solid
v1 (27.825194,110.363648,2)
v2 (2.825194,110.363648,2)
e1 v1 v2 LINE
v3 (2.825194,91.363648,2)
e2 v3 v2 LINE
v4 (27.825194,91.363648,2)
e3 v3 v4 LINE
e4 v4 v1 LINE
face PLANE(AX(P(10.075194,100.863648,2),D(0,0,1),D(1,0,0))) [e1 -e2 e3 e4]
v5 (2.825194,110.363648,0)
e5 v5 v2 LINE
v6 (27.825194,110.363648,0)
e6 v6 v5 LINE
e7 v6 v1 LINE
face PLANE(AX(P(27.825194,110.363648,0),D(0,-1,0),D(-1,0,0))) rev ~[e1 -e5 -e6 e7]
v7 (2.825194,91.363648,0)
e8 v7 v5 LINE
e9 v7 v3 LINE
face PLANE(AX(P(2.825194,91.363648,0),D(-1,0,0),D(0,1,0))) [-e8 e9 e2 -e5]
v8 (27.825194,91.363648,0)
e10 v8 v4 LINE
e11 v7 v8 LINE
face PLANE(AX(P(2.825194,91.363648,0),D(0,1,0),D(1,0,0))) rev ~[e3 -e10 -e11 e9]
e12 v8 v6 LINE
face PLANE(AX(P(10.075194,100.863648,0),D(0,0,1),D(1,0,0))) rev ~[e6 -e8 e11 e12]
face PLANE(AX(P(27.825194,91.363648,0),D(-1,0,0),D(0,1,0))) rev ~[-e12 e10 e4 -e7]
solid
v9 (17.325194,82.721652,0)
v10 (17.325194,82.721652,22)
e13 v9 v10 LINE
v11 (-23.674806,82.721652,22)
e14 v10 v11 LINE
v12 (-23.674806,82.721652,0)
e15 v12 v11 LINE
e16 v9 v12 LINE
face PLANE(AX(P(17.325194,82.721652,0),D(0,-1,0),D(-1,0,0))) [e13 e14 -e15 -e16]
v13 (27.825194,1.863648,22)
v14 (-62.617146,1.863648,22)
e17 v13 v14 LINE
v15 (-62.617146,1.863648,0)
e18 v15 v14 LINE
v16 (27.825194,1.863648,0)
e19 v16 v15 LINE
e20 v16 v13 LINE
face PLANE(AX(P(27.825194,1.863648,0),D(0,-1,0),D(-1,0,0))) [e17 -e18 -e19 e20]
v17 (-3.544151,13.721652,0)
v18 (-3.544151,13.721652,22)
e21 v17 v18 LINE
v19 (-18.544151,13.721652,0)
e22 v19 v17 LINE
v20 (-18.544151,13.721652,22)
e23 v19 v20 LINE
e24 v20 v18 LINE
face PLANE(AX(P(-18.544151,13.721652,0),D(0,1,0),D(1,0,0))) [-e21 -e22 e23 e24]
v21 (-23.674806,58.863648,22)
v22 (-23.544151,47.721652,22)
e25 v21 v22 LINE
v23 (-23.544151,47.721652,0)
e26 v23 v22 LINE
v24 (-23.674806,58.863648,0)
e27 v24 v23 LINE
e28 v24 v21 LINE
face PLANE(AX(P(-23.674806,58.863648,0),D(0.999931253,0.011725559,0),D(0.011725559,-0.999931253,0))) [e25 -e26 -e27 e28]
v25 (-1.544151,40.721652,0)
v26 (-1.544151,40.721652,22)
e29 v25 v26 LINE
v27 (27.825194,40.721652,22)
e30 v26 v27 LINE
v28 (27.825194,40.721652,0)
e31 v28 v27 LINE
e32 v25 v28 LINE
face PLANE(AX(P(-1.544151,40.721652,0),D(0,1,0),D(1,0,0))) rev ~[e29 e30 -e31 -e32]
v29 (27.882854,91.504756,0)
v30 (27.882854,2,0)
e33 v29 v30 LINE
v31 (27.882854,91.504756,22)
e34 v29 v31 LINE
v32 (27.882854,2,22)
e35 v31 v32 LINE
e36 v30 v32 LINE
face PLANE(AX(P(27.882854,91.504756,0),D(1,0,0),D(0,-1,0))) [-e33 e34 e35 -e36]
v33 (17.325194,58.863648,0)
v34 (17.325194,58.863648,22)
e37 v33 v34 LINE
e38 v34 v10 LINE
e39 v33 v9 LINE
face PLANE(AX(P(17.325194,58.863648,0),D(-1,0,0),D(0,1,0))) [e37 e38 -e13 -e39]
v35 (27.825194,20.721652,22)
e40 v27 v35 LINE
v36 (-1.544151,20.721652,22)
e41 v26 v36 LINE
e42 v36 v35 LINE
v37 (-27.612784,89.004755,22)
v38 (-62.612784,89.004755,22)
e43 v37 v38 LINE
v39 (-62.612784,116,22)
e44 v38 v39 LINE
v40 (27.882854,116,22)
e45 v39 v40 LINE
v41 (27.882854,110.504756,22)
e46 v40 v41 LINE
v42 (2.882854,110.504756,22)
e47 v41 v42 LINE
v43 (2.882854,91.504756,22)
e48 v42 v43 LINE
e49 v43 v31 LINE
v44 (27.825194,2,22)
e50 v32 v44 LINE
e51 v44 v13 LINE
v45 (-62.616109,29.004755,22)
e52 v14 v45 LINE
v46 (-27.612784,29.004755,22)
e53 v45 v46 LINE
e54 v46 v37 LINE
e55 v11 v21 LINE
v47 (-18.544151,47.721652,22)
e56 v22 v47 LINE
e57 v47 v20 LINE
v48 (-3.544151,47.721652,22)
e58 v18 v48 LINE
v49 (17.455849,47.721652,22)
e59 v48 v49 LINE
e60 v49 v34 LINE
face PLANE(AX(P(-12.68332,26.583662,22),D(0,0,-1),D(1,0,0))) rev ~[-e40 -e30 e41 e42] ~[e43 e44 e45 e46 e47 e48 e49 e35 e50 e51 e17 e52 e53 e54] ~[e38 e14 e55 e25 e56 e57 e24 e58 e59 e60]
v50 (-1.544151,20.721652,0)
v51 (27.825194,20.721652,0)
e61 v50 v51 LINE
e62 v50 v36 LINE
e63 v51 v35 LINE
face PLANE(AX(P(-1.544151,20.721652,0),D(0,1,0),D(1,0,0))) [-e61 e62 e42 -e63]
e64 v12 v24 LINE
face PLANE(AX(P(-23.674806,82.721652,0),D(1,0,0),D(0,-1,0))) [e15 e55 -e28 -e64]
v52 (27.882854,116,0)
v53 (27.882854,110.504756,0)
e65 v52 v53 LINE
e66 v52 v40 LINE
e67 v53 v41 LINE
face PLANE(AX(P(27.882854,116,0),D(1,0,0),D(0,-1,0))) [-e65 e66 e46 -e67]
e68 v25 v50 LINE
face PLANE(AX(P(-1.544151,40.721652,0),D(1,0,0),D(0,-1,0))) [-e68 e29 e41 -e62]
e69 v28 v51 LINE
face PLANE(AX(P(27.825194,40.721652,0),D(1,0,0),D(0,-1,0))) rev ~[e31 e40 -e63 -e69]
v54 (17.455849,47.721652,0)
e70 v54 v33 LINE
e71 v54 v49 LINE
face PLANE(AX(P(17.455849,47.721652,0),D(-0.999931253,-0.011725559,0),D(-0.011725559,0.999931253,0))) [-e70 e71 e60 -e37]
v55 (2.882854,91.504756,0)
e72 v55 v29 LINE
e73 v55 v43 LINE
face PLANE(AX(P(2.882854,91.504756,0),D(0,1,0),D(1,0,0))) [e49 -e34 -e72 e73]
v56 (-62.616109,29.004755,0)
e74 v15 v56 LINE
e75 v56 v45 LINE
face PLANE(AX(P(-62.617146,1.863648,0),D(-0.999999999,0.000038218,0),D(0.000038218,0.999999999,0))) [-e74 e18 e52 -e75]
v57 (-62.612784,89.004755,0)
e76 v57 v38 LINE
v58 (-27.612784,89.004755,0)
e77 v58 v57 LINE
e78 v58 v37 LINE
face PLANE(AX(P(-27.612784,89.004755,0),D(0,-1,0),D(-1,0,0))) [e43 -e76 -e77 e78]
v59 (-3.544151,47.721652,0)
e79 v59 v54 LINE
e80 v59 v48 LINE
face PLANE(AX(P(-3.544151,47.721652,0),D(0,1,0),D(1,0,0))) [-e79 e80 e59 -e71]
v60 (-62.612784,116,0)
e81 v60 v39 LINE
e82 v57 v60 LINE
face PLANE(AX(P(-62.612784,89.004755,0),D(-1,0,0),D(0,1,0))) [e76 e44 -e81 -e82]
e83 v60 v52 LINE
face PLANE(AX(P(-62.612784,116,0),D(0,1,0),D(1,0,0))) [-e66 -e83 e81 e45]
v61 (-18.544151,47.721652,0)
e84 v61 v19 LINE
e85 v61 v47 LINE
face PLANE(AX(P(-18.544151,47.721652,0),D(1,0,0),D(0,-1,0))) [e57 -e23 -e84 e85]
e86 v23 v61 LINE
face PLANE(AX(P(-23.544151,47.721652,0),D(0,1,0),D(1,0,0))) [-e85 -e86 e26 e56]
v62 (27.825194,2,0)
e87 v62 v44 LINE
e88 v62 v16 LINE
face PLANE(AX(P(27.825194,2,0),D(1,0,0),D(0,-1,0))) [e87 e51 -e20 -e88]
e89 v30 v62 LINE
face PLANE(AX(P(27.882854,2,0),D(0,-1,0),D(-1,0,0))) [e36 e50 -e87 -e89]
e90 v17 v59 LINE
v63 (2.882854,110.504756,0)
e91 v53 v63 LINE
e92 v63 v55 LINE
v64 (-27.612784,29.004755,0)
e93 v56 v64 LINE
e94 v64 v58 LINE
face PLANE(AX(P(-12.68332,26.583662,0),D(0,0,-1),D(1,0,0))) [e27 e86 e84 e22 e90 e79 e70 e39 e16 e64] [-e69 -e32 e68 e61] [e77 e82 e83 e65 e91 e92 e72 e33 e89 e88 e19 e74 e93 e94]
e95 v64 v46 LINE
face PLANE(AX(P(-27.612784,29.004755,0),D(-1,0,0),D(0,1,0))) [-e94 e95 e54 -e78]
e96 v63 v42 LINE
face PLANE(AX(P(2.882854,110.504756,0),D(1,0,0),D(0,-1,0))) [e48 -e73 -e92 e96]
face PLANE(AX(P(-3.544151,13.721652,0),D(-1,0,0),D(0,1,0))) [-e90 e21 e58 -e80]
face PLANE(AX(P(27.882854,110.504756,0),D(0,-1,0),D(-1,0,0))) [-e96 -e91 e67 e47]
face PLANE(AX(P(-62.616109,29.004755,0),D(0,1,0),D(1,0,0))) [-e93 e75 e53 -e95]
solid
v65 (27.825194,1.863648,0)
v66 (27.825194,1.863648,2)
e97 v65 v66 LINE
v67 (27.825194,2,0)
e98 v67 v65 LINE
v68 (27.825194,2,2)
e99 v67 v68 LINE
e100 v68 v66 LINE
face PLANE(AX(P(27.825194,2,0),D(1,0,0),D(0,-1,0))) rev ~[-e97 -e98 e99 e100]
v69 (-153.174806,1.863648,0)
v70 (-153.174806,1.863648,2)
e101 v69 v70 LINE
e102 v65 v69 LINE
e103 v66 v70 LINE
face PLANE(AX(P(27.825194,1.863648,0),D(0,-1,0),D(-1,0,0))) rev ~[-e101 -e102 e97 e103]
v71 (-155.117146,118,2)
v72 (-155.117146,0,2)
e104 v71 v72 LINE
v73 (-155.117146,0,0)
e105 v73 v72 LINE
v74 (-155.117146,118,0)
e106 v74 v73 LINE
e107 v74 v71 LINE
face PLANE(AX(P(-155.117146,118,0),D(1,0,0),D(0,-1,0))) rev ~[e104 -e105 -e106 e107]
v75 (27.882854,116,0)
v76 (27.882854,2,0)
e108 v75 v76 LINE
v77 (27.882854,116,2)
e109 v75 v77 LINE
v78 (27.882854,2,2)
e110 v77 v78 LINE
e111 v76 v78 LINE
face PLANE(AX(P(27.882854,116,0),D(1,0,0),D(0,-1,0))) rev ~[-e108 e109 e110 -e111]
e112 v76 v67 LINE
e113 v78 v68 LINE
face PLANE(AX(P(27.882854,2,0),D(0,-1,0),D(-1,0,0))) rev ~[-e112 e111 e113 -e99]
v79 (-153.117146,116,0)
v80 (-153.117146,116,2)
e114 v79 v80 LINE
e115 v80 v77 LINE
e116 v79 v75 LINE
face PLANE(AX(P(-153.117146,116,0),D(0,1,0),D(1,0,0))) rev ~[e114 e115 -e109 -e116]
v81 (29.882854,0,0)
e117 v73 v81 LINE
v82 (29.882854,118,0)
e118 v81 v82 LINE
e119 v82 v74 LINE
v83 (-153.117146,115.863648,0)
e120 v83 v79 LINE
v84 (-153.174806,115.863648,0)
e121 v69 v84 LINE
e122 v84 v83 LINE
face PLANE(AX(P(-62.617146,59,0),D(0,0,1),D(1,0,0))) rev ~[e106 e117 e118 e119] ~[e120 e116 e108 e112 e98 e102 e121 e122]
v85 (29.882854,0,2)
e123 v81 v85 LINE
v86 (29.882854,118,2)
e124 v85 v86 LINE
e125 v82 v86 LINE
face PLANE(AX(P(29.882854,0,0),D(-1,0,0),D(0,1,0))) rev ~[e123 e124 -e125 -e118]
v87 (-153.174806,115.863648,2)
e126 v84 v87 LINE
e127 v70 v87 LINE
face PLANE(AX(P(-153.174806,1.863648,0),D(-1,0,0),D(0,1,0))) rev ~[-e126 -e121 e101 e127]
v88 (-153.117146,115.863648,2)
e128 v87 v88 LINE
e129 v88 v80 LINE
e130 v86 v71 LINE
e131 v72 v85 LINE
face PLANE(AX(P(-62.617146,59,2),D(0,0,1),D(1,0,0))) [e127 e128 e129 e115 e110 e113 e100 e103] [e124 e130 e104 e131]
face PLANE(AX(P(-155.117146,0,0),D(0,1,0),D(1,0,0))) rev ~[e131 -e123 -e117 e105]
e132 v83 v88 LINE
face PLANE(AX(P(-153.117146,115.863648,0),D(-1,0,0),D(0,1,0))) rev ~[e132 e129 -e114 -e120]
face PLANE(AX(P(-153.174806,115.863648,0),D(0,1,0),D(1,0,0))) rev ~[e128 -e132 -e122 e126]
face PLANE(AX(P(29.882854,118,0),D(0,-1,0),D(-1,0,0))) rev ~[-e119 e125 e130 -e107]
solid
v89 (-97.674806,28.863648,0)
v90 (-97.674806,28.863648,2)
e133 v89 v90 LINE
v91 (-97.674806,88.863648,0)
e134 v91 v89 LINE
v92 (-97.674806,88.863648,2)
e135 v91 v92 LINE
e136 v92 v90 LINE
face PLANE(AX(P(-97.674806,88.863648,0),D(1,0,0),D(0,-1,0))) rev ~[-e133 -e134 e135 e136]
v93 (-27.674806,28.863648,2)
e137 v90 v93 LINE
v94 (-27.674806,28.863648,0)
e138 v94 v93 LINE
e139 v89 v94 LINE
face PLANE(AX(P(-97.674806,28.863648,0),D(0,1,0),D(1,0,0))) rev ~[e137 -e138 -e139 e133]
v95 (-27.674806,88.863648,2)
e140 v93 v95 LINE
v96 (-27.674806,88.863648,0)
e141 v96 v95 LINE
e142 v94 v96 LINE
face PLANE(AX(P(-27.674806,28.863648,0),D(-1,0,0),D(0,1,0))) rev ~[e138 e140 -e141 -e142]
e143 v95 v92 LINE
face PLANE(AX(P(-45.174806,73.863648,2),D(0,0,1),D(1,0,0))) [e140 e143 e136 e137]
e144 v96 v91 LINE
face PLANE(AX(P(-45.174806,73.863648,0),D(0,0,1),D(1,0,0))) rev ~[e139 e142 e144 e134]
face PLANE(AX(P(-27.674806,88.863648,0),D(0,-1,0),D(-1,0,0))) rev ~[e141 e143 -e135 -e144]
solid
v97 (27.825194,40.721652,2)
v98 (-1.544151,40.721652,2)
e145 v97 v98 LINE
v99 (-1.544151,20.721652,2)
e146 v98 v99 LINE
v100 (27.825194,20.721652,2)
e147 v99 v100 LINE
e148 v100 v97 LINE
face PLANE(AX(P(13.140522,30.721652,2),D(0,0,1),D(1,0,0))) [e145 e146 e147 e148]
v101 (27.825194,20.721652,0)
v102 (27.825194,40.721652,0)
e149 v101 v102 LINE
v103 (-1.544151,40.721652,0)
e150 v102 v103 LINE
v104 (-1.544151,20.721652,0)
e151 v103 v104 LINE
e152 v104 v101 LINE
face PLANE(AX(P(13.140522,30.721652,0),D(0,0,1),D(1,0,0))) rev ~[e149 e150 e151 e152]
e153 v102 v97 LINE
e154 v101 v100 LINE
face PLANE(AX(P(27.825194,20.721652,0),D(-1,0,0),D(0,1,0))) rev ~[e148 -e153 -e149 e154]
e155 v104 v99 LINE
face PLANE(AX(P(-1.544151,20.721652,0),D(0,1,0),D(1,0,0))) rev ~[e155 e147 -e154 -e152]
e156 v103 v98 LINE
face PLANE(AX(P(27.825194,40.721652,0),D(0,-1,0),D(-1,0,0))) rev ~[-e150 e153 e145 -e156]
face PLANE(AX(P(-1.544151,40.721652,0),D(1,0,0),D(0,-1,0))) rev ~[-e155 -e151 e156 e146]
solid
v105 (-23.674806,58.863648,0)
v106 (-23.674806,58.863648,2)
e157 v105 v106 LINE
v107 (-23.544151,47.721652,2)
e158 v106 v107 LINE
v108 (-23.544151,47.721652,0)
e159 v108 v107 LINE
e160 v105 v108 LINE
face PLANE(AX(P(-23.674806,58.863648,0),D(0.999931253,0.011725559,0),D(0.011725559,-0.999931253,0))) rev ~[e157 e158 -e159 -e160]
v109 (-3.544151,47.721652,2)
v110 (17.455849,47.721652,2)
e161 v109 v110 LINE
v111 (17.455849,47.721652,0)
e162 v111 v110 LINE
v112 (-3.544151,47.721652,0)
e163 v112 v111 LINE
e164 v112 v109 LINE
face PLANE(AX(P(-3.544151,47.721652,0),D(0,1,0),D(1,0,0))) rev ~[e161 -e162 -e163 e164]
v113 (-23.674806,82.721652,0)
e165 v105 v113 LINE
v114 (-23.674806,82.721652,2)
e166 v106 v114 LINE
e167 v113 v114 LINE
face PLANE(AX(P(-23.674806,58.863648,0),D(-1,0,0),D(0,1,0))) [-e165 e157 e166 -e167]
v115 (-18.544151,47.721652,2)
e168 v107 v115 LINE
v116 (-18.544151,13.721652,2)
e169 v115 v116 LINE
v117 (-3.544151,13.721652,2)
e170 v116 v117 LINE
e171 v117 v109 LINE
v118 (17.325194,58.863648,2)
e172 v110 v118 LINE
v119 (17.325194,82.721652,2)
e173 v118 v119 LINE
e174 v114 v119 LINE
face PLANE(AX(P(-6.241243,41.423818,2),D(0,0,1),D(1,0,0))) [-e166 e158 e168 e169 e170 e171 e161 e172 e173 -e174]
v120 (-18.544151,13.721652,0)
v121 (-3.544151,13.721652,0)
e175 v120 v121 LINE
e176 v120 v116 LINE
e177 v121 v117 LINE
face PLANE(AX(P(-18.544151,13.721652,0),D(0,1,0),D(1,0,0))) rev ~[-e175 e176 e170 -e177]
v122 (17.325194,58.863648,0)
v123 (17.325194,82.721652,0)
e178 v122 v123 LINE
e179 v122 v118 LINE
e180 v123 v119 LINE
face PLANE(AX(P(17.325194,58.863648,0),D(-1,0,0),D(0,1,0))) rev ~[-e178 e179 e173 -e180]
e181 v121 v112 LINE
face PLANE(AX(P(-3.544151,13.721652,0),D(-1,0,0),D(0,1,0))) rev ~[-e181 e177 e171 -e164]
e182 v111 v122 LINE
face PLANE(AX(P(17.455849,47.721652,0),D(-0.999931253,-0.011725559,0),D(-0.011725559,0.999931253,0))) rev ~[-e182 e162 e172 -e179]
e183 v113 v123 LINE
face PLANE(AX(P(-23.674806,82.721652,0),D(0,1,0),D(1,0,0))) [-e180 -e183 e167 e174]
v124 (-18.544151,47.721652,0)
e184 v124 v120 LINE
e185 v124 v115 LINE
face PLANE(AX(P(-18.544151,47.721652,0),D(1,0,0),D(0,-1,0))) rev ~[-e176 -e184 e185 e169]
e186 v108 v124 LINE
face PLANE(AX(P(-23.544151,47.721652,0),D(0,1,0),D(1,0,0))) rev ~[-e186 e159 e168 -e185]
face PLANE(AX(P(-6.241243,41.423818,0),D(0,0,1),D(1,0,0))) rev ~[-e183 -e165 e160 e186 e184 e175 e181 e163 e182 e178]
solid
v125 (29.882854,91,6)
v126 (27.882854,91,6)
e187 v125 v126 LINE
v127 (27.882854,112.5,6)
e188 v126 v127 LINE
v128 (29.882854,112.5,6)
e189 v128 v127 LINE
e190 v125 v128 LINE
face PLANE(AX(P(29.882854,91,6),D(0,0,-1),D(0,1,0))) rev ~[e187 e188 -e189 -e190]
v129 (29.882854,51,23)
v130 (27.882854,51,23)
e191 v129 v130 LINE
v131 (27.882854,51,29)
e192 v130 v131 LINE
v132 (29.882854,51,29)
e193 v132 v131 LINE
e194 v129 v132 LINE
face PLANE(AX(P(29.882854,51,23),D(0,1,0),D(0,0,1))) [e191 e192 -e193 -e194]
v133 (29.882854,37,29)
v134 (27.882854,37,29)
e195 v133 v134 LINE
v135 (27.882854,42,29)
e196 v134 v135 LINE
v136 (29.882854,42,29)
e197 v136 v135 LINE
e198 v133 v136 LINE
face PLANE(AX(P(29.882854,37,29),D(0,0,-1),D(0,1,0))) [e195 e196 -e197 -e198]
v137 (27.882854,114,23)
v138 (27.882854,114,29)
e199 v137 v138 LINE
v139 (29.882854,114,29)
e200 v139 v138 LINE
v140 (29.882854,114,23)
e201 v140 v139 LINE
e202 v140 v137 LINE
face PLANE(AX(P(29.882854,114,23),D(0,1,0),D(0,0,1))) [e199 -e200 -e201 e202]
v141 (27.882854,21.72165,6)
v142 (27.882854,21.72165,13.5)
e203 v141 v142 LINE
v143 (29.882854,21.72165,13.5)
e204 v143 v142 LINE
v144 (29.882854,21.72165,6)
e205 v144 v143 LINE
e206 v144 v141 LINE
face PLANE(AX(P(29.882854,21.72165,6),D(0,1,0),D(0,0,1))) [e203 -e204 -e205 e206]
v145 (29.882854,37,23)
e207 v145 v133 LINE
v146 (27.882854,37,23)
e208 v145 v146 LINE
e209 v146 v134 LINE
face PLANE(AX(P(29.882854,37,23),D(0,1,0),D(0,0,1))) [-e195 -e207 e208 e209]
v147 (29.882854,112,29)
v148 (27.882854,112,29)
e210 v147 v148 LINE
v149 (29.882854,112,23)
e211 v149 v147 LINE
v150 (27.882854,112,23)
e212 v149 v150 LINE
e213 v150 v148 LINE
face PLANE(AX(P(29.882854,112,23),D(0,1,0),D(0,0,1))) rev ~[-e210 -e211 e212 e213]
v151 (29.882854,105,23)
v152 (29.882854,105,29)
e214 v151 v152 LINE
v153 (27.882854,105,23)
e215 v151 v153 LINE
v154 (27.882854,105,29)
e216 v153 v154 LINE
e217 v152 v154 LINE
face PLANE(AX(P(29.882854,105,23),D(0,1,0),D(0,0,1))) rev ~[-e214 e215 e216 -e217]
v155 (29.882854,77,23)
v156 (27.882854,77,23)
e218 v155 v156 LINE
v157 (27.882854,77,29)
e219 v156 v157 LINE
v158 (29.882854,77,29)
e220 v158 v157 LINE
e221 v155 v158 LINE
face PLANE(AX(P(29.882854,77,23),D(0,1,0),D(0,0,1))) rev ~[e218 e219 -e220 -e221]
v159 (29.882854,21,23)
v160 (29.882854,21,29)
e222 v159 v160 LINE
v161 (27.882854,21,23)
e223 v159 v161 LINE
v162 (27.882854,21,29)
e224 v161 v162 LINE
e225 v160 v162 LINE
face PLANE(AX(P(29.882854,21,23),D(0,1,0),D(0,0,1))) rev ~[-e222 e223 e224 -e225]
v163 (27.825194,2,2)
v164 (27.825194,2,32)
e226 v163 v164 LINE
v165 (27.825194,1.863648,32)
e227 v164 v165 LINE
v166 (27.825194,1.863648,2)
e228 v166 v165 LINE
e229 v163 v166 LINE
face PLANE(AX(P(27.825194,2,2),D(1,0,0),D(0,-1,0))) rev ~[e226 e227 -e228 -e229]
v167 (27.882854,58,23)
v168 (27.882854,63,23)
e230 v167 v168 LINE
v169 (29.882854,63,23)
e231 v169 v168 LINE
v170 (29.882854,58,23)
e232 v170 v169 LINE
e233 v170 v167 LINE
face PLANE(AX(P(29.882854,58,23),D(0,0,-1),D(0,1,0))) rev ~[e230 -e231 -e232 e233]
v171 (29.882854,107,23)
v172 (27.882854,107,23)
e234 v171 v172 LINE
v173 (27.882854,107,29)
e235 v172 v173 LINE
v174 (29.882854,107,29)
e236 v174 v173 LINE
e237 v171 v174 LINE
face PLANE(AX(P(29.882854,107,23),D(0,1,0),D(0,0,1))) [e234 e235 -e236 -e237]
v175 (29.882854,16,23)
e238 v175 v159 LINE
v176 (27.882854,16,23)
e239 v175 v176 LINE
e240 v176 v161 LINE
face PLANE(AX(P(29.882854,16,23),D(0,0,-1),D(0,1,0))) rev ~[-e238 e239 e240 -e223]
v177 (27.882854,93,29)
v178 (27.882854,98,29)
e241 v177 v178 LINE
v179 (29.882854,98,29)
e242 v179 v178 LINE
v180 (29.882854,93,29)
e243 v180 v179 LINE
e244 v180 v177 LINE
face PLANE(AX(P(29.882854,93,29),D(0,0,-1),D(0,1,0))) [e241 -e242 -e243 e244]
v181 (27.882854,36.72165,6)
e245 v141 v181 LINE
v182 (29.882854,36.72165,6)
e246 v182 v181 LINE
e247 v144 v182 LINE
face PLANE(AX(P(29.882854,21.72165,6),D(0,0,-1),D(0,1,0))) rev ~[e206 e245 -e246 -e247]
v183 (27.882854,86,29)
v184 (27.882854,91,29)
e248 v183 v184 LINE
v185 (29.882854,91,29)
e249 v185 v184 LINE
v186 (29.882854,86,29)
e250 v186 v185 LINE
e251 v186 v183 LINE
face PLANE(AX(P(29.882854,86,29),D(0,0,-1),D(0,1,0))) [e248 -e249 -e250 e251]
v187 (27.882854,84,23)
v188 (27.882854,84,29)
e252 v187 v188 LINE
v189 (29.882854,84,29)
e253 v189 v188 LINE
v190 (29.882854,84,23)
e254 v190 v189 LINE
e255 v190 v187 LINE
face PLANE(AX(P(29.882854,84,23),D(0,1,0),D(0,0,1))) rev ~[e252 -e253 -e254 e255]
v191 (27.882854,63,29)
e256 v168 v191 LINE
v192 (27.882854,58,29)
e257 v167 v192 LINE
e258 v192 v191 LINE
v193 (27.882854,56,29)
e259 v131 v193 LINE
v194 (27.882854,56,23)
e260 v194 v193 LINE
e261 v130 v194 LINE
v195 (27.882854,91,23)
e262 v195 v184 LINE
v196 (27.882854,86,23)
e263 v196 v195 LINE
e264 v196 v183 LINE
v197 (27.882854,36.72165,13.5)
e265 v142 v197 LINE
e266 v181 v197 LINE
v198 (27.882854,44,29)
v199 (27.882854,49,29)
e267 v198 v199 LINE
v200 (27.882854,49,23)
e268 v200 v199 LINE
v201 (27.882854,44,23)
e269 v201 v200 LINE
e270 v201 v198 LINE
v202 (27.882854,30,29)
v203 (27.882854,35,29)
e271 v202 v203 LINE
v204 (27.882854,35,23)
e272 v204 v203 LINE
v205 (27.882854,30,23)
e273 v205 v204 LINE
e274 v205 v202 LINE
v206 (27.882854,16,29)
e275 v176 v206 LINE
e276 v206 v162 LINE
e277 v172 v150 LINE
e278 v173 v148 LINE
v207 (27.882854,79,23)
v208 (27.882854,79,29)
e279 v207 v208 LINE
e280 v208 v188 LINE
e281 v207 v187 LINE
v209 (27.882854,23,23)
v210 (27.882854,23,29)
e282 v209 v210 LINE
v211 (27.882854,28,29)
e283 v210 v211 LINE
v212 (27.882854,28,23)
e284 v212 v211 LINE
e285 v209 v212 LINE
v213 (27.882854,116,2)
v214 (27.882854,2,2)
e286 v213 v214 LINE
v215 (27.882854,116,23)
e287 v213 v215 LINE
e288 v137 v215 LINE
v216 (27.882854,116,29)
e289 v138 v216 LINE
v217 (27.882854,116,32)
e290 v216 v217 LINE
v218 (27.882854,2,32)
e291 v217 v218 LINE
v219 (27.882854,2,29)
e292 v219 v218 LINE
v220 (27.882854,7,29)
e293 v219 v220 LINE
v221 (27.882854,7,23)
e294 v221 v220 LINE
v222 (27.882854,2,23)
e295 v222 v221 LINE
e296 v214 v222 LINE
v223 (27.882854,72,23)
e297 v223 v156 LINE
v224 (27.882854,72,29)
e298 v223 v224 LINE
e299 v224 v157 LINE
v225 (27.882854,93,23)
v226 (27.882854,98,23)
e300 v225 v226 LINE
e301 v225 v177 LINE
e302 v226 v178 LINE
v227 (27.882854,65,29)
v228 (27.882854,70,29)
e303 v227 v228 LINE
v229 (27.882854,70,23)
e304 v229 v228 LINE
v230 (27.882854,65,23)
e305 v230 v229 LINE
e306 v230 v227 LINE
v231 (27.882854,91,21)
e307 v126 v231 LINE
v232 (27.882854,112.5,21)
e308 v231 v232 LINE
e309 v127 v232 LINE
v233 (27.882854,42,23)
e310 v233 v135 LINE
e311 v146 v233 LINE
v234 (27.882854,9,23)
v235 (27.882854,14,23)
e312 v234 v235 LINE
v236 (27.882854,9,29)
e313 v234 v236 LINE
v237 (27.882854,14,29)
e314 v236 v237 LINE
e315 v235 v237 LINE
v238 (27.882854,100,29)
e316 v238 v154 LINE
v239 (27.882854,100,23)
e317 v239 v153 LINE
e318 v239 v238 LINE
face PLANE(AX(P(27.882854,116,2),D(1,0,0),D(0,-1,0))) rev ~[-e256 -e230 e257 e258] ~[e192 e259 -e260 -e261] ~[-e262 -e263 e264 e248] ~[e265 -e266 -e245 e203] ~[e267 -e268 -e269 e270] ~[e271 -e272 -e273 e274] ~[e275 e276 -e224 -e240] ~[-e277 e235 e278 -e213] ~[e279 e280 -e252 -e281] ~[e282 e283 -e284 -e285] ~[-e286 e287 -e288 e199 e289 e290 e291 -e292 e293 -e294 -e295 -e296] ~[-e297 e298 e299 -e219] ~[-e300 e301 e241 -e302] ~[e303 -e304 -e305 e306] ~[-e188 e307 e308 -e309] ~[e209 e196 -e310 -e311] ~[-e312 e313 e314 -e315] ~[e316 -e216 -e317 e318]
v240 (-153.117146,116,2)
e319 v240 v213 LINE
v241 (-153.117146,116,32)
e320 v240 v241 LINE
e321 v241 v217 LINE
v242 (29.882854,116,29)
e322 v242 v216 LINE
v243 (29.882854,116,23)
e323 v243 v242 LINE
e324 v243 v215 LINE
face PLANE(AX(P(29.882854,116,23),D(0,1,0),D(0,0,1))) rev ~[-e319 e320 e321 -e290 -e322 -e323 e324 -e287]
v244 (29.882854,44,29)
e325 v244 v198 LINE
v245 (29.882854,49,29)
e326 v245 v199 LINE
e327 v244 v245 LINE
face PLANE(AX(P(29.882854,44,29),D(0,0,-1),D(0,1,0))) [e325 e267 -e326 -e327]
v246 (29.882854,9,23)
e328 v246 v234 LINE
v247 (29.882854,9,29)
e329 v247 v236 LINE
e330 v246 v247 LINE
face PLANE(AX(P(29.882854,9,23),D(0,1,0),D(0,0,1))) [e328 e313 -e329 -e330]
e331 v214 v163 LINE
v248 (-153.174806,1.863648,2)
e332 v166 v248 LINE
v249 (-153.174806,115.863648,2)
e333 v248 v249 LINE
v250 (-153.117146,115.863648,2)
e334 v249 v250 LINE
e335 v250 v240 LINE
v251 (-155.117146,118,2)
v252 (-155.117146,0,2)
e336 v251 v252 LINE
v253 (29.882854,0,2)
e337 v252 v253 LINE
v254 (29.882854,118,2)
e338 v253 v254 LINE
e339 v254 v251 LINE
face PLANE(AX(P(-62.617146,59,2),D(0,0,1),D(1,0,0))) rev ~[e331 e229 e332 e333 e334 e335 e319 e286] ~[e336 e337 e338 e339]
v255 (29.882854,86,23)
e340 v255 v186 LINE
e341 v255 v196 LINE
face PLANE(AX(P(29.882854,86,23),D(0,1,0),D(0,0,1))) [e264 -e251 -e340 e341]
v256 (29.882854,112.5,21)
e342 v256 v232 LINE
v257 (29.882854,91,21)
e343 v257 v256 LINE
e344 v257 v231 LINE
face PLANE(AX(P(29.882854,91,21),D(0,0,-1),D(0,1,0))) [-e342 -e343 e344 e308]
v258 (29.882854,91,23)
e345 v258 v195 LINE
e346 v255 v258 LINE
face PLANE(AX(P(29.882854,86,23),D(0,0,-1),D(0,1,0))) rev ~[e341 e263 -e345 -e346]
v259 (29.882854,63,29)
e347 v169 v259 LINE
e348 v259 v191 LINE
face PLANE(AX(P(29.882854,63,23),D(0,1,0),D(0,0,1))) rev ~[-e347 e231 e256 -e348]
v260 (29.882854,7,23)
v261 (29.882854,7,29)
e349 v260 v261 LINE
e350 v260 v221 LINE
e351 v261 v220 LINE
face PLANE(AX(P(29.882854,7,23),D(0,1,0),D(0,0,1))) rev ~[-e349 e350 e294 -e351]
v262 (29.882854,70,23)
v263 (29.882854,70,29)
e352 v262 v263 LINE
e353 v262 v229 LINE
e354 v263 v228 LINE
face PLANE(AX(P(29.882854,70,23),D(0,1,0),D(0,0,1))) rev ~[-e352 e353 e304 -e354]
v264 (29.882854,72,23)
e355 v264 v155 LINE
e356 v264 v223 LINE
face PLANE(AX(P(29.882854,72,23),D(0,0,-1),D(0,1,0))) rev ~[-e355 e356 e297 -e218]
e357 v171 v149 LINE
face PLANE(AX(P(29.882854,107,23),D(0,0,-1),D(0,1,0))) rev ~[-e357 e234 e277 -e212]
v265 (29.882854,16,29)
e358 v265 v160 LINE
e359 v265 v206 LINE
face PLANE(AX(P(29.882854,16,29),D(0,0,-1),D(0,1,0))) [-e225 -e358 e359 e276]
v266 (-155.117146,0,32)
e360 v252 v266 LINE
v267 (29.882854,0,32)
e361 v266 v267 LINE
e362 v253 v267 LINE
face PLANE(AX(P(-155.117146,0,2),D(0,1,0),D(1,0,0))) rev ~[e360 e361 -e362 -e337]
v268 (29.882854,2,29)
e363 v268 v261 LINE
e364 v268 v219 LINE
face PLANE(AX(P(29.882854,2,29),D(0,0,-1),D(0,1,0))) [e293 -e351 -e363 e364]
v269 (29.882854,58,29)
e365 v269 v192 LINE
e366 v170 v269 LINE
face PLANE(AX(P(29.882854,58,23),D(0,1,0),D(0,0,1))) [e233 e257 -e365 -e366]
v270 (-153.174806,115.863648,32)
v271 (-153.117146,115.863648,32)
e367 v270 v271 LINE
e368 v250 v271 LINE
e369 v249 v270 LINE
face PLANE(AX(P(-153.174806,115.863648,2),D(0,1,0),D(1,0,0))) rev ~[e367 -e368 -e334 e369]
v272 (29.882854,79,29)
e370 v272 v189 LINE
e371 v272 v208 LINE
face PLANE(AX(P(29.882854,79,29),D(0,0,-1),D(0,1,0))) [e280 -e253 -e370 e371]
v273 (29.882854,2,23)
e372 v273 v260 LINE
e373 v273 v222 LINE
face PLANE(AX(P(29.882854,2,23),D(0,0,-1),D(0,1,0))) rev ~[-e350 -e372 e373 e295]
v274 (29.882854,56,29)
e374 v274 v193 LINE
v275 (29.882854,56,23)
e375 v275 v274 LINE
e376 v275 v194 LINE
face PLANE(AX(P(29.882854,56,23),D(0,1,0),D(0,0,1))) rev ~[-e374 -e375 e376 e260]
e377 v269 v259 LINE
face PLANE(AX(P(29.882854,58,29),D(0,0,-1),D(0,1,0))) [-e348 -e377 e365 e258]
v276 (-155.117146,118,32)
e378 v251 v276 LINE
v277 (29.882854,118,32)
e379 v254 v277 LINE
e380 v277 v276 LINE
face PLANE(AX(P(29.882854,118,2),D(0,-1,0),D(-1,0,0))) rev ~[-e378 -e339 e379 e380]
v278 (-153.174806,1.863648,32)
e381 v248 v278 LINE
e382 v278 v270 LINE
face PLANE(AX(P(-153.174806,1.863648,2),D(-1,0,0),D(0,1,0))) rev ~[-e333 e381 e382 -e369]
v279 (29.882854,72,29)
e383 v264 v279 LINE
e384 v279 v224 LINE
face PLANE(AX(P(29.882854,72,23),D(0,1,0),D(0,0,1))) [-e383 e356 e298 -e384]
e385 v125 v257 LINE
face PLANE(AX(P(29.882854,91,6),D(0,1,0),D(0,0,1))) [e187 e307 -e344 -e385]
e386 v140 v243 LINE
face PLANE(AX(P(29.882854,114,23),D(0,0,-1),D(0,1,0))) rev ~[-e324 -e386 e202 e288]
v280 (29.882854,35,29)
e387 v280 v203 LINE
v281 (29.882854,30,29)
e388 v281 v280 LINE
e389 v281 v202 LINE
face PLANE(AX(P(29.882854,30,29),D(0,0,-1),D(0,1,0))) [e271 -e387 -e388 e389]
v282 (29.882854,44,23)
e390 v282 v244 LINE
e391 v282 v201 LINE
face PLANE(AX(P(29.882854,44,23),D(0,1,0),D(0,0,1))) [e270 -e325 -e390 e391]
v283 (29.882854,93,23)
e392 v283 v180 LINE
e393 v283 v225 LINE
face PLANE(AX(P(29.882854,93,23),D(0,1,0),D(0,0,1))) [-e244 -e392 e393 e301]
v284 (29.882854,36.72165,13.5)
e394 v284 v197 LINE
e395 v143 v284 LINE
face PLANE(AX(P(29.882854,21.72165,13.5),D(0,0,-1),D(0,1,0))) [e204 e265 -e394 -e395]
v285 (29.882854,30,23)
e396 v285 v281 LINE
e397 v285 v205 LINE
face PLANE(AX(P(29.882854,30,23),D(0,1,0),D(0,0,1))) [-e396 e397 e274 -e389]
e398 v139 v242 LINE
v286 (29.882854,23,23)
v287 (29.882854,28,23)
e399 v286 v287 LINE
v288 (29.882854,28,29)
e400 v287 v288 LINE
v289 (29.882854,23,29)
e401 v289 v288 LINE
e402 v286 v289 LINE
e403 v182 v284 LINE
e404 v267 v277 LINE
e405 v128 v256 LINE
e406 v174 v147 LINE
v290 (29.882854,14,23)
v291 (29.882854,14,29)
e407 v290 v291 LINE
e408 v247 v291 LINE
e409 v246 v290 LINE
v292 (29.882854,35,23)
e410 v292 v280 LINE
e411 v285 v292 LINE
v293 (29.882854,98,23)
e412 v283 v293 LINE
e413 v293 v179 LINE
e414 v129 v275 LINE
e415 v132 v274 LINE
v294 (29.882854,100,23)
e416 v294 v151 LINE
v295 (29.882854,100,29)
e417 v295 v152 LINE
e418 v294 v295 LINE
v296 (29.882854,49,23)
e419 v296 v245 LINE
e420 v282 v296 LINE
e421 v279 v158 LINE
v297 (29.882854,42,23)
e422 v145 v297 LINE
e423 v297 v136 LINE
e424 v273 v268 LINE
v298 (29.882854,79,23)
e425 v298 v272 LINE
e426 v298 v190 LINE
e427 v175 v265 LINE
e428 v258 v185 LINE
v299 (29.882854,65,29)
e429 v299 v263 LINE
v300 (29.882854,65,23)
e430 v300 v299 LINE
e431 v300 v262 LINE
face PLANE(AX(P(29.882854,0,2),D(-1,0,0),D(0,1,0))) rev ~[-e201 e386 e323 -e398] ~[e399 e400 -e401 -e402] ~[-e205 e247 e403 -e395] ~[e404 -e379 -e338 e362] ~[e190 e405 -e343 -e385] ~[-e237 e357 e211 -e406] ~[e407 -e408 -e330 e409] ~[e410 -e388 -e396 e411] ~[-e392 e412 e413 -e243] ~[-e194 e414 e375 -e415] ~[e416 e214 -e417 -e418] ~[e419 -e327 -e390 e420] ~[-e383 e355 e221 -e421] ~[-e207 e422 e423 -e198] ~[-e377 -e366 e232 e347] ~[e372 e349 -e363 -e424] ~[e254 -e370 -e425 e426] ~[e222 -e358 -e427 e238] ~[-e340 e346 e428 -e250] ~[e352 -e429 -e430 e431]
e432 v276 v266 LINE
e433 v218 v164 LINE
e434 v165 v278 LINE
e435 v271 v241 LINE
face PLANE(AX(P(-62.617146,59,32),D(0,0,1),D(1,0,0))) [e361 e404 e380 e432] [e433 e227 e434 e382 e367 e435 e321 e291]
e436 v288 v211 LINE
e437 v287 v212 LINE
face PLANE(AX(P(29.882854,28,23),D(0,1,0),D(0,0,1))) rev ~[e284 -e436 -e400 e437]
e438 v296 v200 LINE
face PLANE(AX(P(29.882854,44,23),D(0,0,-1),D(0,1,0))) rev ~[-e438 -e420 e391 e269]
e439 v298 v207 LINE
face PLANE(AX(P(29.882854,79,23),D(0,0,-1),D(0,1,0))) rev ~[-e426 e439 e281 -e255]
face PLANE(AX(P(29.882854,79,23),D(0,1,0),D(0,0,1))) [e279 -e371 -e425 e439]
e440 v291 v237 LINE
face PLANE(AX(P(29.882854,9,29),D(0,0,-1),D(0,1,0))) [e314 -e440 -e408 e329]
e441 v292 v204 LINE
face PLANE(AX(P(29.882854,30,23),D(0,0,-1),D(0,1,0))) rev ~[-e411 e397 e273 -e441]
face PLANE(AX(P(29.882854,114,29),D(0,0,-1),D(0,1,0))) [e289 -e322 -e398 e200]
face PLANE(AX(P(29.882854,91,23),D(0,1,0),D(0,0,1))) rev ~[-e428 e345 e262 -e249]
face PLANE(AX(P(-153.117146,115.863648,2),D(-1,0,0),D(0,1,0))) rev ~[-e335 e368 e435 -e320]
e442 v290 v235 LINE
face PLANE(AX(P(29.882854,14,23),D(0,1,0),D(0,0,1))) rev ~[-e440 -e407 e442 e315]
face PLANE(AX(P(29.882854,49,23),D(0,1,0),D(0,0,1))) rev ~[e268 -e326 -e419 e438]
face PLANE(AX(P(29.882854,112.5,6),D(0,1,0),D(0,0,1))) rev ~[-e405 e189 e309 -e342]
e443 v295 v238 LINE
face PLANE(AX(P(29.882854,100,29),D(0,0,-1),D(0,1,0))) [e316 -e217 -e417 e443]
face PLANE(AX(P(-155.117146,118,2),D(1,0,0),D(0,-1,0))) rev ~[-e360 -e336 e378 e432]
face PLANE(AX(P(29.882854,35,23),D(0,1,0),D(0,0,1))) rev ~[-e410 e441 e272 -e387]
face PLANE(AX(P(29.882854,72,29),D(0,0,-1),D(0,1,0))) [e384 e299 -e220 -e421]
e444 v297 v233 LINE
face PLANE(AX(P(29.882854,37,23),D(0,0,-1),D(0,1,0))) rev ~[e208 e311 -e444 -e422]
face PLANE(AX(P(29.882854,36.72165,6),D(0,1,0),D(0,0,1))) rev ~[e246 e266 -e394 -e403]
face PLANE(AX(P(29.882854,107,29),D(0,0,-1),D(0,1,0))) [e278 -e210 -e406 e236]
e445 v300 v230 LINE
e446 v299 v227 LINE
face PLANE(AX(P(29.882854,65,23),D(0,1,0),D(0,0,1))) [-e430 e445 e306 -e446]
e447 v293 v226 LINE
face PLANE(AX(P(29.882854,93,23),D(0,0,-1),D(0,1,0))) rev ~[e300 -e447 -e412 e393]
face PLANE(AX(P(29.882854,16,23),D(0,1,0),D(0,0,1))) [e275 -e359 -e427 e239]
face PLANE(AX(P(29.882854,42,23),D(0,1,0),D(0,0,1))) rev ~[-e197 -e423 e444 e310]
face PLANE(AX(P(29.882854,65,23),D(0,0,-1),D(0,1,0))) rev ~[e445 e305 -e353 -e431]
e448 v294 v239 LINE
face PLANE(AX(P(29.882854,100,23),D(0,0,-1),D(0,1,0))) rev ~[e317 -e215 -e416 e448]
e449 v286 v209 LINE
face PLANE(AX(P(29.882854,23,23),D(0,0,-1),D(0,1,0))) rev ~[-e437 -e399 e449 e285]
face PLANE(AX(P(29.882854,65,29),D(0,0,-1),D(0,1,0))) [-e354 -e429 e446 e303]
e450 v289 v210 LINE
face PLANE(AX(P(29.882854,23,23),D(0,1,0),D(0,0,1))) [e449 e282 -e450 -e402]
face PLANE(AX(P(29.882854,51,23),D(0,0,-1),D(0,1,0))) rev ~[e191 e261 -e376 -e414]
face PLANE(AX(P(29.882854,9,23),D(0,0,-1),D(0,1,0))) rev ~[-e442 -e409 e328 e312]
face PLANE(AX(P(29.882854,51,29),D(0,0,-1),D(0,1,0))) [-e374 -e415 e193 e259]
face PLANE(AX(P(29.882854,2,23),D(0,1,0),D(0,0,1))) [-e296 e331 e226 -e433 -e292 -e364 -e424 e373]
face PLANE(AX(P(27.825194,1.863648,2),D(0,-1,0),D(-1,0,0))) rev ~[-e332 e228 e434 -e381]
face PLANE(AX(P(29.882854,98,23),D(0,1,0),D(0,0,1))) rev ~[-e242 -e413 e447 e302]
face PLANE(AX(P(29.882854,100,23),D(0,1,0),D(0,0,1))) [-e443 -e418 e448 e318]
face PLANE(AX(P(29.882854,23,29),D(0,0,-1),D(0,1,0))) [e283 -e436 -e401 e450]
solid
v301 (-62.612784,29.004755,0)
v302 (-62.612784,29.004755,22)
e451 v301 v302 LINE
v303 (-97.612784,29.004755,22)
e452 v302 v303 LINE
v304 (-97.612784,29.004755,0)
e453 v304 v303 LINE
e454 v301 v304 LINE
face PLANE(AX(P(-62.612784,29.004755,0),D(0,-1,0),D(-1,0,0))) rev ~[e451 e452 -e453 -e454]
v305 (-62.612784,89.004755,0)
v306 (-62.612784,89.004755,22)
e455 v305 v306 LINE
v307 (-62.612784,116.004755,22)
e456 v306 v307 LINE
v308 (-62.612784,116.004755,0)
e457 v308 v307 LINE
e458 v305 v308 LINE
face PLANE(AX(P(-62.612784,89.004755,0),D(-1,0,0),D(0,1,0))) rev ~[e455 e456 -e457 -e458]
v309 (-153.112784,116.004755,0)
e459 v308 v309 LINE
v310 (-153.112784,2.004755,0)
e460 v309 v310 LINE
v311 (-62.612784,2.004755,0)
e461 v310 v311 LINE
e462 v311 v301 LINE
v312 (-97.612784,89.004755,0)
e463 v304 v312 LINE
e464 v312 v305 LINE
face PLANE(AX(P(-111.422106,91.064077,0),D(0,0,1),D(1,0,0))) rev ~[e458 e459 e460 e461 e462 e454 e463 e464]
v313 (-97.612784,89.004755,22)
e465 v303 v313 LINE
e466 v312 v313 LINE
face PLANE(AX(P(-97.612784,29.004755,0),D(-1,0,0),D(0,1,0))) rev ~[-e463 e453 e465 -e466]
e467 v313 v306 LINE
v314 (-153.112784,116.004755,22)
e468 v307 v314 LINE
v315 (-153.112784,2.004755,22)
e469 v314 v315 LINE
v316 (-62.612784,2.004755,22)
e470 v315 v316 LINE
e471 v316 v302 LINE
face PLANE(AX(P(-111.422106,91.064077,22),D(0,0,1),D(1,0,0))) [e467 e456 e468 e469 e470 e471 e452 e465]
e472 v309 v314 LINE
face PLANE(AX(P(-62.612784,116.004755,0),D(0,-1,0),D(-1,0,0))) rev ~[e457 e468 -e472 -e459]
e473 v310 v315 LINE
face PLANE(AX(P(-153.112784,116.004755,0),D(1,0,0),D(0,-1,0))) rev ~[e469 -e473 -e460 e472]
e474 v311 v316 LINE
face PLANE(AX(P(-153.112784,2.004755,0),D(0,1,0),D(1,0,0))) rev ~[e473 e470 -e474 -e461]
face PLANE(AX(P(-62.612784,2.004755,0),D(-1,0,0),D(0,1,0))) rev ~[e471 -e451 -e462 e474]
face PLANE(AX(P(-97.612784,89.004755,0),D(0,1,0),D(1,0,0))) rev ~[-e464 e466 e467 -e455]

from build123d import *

# Parameters (mm, degrees)
F1_DEPTH = 2
F0_W     = 41
F0_H     = 23.8580039246
F0_W_2   = 35
F0_H_2   = 30
F0_W_3   = 14.5
F0_H_3   = 19
F0_W_4   = 10.5
F3_DEPTH = 22
F4_DEPTH = 30
F5_W     = 29.3693448901
F5_H     = 20
F6_DEPTH = 22
F7_W     = 5
F7_H     = 6
F7_W_2   = 2
F7_W_3   = 15
F7_H_2   = 7.5
F7_W_4   = 21.5
F7_H_3   = 15
F8_DEPTH = 2


with BuildPart() as f1:
    # F0 (on Top) → F1 (new body)
    with BuildSketch(Plane.XY):
        Polygon((29.8828537283, 118), (-155.1171462717, 118), (-155.1171462717, 0), (29.8828537283, 0), (29.8828537283, 47.8673752217), align=None)
        Polygon((27.8828537283, 108.5818558931), (27.8828537283, 47.8439224922), (27.8828537283, 9.4181441069), (27.8828537283, 2), (27.8251939824, 2), (27.8251939824, 1.8636477081), (-62.6748060176, 1.8636477081), (-153.1748060176, 1.8636477081), (-153.1748060176, 58.8636477081), (-153.1748060176, 115.8636477081), (-153.1171462717, 115.8636477081), (-153.1171462717, 116), (27.8828537283, 116), align=None, mode=Mode.SUBTRACT)
    extrude(amount=F1_DEPTH)


with BuildPart() as f1b:
    # F0 (on Top) → F1, piece 2 (new body)
    with BuildSketch(Plane.XY):
        Polygon((27.8251939824, 20.7216516327), (27.8251939824, 40.7216516327), (-1.5441509077, 40.7216516327), (-1.5441509077, 30.7216516327), (-1.5441509077, 20.7216516327), align=None)
    extrude(amount=F1_DEPTH)


with BuildPart() as f1c:
    # F0 (on Top) → F1, piece 3 (new body)
    with BuildSketch(Plane.XY):
        Polygon((-1.5441509077, 47.7216516327), (17.4558490923, 47.7216516327), (17.3251939824, 58.8636477081), (-23.6748060176, 58.8636477081), (-23.5441509077, 47.7216516327), (-18.5441509077, 47.7216516327), (-18.5441509077, 13.7216516327), (-3.5441509077, 13.7216516327), (-3.5441509077, 47.7216516327), align=None)
        with Locations((-3.1748060176, 70.7926496704)):
            Rectangle(F0_W, F0_H)
    extrude(amount=F1_DEPTH)


with BuildPart() as f1d:
    # F0 (on Top) → F1, piece 4 (new body)
    with BuildSketch(Plane.XY):
        with Locations((-45.1748060176, 73.8636477081)):
            Rectangle(F0_W_2, F0_H_2)
        with Locations((-80.1748060176, 73.8636477081)):
            Rectangle(F0_W_2, F0_H_2)
        with Locations((-80.1748060176, 43.8636477081)):
            Rectangle(F0_W_2, F0_H_2)
        with Locations((-45.1748060176, 43.8636477081)):
            Rectangle(F0_W_2, F0_H_2)
    extrude(amount=F1_DEPTH)


with BuildPart() as f1e:
    # F0 (on Top) → F1, piece 5 (new body)
    with BuildSketch(Plane.XY):
        with Locations((10.0751939824, 100.8636477081)):
            Rectangle(F0_W_3, F0_H_3)
        with Locations((22.5751939824, 100.8636477081)):
            Rectangle(F0_W_4, F0_H_3)
    extrude(amount=F1_DEPTH)


with BuildPart() as f3:
    # F2 (on Top) → F3 (new body)
    with BuildSketch(Plane.XY):
        Polygon((-62.6127840281, 116.0047547296), (-153.1127840281, 116.0047547296), (-153.1127840281, 59.0047547296), (-97.6127840281, 59.0047547296), (-97.6127840281, 89.0047547296), (-62.6127840281, 89.0047547296), align=None)
        Polygon((-97.6127840281, 59.0047547296), (-153.1127840281, 59.0047547296), (-153.1127840281, 2.0047547296), (-62.6127840281, 2.0047547296), (-62.6127840281, 29.0047547296), (-97.6127840281, 29.0047547296), align=None)
    extrude(amount=F3_DEPTH)


with BuildPart() as f4:
    # F4 (new): a face of the model
    f4_faces = [f1.part.faces().sort_by_distance(p)[0] for p in [
        (-62.6171462717, 117.7805711961, 2),
    ]]
    extrude(f4_faces, amount=F4_DEPTH)

    # F7 (on face) → F8 (cut)
    with BuildSketch(Plane.YZ.offset(29.8828537283)):
        with Locations((4.5, 26)):
            Rectangle(F7_W, F7_H)
        with Locations((11.5, 26)):
            Rectangle(F7_W, F7_H)
        with Locations((18.5, 26)):
            Rectangle(F7_W, F7_H)
        with Locations((25.5, 26)):
            Rectangle(F7_W, F7_H)
        with Locations((32.5, 26)):
            Rectangle(F7_W, F7_H)
        with Locations((39.5, 26)):
            Rectangle(F7_W, F7_H)
        with Locations((46.5, 26)):
            Rectangle(F7_W, F7_H)
        with Locations((53.5, 26)):
            Rectangle(F7_W, F7_H)
        with Locations((60.5, 26)):
            Rectangle(F7_W, F7_H)
        with Locations((67.5, 26)):
            Rectangle(F7_W, F7_H)
        with Locations((74.5, 26)):
            Rectangle(F7_W, F7_H)
        with Locations((81.5, 26)):
            Rectangle(F7_W, F7_H)
        with Locations((88.5, 26)):
            Rectangle(F7_W, F7_H)
        with Locations((95.5, 26)):
            Rectangle(F7_W, F7_H)
        with Locations((102.5, 26)):
            Rectangle(F7_W, F7_H)
        with Locations((109.5, 26)):
            Rectangle(F7_W, F7_H)
        with Locations((115, 26)):
            Rectangle(F7_W_2, F7_H)
        with Locations((29.22165, 9.75)):
            Rectangle(F7_W_3, F7_H_2)
        with Locations((101.75, 13.5)):
            Rectangle(F7_W_4, F7_H_3)
    extrude(amount=-F8_DEPTH, mode=Mode.SUBTRACT)


with BuildPart() as f6:
    # F5 (on face) → F6 (new body)
    with BuildSketch(Plane(origin=(0, 0, 0), x_dir=(1, 0, 0), z_dir=(0, 0, -1))):
        Polygon((-27.6127840281, -29.0047547296), (-27.6127840281, -59.0047547296), (-23.6748060176, -59.0047547296), (-23.6748060176, -58.8636477081), (-23.5441509077, -47.7216516327), (-18.5441509077, -47.7216516327), (-18.5441509077, -13.7216516327), (-3.5441509077, -13.7216516327), (-3.5441509077, -47.7216516327), (17.4558490923, -47.7216516327), (17.3251939824, -58.8636477081), (17.3251939824, -59.0047547296), (20.3872159719, -59.0047547296), (27.8828537283, -59.0047547296), (27.8828537283, -2), (27.8251939824, -2), (27.8251939824, -1.8636477081), (-62.6171462717, -1.8636477081), (-62.6161089932, -29.0047547296), (-62.6127840281, -29.0047547296), align=None)
        with Locations((13.1405215374, -30.7216516327)):
            Rectangle(F5_W, F5_H, mode=Mode.SUBTRACT)
        Polygon((-27.6127840281, -89.0047547296), (-62.6127840281, -89.0047547296), (-62.6127840281, -116), (27.8828537283, -116), (27.8828537283, -110.5047564595), (2.8828537283, -110.5047564595), (2.8828537283, -91.5047564595), (27.8828537283, -91.5047564595), (27.8828537283, -59.0047547296), (20.3872159719, -59.0047547296), (17.3251939824, -59.0047547296), (17.3251939824, -82.7216516327), (-23.6748060176, -82.7216516327), (-23.6748060176, -59.0047547296), (-27.6127840281, -59.0047547296), align=None)
    extrude(amount=-F6_DEPTH)


solid = Compound([f1.part, f1b.part, f1c.part, f1d.part, f1e.part, f3.part, f4.part, f6.part])
